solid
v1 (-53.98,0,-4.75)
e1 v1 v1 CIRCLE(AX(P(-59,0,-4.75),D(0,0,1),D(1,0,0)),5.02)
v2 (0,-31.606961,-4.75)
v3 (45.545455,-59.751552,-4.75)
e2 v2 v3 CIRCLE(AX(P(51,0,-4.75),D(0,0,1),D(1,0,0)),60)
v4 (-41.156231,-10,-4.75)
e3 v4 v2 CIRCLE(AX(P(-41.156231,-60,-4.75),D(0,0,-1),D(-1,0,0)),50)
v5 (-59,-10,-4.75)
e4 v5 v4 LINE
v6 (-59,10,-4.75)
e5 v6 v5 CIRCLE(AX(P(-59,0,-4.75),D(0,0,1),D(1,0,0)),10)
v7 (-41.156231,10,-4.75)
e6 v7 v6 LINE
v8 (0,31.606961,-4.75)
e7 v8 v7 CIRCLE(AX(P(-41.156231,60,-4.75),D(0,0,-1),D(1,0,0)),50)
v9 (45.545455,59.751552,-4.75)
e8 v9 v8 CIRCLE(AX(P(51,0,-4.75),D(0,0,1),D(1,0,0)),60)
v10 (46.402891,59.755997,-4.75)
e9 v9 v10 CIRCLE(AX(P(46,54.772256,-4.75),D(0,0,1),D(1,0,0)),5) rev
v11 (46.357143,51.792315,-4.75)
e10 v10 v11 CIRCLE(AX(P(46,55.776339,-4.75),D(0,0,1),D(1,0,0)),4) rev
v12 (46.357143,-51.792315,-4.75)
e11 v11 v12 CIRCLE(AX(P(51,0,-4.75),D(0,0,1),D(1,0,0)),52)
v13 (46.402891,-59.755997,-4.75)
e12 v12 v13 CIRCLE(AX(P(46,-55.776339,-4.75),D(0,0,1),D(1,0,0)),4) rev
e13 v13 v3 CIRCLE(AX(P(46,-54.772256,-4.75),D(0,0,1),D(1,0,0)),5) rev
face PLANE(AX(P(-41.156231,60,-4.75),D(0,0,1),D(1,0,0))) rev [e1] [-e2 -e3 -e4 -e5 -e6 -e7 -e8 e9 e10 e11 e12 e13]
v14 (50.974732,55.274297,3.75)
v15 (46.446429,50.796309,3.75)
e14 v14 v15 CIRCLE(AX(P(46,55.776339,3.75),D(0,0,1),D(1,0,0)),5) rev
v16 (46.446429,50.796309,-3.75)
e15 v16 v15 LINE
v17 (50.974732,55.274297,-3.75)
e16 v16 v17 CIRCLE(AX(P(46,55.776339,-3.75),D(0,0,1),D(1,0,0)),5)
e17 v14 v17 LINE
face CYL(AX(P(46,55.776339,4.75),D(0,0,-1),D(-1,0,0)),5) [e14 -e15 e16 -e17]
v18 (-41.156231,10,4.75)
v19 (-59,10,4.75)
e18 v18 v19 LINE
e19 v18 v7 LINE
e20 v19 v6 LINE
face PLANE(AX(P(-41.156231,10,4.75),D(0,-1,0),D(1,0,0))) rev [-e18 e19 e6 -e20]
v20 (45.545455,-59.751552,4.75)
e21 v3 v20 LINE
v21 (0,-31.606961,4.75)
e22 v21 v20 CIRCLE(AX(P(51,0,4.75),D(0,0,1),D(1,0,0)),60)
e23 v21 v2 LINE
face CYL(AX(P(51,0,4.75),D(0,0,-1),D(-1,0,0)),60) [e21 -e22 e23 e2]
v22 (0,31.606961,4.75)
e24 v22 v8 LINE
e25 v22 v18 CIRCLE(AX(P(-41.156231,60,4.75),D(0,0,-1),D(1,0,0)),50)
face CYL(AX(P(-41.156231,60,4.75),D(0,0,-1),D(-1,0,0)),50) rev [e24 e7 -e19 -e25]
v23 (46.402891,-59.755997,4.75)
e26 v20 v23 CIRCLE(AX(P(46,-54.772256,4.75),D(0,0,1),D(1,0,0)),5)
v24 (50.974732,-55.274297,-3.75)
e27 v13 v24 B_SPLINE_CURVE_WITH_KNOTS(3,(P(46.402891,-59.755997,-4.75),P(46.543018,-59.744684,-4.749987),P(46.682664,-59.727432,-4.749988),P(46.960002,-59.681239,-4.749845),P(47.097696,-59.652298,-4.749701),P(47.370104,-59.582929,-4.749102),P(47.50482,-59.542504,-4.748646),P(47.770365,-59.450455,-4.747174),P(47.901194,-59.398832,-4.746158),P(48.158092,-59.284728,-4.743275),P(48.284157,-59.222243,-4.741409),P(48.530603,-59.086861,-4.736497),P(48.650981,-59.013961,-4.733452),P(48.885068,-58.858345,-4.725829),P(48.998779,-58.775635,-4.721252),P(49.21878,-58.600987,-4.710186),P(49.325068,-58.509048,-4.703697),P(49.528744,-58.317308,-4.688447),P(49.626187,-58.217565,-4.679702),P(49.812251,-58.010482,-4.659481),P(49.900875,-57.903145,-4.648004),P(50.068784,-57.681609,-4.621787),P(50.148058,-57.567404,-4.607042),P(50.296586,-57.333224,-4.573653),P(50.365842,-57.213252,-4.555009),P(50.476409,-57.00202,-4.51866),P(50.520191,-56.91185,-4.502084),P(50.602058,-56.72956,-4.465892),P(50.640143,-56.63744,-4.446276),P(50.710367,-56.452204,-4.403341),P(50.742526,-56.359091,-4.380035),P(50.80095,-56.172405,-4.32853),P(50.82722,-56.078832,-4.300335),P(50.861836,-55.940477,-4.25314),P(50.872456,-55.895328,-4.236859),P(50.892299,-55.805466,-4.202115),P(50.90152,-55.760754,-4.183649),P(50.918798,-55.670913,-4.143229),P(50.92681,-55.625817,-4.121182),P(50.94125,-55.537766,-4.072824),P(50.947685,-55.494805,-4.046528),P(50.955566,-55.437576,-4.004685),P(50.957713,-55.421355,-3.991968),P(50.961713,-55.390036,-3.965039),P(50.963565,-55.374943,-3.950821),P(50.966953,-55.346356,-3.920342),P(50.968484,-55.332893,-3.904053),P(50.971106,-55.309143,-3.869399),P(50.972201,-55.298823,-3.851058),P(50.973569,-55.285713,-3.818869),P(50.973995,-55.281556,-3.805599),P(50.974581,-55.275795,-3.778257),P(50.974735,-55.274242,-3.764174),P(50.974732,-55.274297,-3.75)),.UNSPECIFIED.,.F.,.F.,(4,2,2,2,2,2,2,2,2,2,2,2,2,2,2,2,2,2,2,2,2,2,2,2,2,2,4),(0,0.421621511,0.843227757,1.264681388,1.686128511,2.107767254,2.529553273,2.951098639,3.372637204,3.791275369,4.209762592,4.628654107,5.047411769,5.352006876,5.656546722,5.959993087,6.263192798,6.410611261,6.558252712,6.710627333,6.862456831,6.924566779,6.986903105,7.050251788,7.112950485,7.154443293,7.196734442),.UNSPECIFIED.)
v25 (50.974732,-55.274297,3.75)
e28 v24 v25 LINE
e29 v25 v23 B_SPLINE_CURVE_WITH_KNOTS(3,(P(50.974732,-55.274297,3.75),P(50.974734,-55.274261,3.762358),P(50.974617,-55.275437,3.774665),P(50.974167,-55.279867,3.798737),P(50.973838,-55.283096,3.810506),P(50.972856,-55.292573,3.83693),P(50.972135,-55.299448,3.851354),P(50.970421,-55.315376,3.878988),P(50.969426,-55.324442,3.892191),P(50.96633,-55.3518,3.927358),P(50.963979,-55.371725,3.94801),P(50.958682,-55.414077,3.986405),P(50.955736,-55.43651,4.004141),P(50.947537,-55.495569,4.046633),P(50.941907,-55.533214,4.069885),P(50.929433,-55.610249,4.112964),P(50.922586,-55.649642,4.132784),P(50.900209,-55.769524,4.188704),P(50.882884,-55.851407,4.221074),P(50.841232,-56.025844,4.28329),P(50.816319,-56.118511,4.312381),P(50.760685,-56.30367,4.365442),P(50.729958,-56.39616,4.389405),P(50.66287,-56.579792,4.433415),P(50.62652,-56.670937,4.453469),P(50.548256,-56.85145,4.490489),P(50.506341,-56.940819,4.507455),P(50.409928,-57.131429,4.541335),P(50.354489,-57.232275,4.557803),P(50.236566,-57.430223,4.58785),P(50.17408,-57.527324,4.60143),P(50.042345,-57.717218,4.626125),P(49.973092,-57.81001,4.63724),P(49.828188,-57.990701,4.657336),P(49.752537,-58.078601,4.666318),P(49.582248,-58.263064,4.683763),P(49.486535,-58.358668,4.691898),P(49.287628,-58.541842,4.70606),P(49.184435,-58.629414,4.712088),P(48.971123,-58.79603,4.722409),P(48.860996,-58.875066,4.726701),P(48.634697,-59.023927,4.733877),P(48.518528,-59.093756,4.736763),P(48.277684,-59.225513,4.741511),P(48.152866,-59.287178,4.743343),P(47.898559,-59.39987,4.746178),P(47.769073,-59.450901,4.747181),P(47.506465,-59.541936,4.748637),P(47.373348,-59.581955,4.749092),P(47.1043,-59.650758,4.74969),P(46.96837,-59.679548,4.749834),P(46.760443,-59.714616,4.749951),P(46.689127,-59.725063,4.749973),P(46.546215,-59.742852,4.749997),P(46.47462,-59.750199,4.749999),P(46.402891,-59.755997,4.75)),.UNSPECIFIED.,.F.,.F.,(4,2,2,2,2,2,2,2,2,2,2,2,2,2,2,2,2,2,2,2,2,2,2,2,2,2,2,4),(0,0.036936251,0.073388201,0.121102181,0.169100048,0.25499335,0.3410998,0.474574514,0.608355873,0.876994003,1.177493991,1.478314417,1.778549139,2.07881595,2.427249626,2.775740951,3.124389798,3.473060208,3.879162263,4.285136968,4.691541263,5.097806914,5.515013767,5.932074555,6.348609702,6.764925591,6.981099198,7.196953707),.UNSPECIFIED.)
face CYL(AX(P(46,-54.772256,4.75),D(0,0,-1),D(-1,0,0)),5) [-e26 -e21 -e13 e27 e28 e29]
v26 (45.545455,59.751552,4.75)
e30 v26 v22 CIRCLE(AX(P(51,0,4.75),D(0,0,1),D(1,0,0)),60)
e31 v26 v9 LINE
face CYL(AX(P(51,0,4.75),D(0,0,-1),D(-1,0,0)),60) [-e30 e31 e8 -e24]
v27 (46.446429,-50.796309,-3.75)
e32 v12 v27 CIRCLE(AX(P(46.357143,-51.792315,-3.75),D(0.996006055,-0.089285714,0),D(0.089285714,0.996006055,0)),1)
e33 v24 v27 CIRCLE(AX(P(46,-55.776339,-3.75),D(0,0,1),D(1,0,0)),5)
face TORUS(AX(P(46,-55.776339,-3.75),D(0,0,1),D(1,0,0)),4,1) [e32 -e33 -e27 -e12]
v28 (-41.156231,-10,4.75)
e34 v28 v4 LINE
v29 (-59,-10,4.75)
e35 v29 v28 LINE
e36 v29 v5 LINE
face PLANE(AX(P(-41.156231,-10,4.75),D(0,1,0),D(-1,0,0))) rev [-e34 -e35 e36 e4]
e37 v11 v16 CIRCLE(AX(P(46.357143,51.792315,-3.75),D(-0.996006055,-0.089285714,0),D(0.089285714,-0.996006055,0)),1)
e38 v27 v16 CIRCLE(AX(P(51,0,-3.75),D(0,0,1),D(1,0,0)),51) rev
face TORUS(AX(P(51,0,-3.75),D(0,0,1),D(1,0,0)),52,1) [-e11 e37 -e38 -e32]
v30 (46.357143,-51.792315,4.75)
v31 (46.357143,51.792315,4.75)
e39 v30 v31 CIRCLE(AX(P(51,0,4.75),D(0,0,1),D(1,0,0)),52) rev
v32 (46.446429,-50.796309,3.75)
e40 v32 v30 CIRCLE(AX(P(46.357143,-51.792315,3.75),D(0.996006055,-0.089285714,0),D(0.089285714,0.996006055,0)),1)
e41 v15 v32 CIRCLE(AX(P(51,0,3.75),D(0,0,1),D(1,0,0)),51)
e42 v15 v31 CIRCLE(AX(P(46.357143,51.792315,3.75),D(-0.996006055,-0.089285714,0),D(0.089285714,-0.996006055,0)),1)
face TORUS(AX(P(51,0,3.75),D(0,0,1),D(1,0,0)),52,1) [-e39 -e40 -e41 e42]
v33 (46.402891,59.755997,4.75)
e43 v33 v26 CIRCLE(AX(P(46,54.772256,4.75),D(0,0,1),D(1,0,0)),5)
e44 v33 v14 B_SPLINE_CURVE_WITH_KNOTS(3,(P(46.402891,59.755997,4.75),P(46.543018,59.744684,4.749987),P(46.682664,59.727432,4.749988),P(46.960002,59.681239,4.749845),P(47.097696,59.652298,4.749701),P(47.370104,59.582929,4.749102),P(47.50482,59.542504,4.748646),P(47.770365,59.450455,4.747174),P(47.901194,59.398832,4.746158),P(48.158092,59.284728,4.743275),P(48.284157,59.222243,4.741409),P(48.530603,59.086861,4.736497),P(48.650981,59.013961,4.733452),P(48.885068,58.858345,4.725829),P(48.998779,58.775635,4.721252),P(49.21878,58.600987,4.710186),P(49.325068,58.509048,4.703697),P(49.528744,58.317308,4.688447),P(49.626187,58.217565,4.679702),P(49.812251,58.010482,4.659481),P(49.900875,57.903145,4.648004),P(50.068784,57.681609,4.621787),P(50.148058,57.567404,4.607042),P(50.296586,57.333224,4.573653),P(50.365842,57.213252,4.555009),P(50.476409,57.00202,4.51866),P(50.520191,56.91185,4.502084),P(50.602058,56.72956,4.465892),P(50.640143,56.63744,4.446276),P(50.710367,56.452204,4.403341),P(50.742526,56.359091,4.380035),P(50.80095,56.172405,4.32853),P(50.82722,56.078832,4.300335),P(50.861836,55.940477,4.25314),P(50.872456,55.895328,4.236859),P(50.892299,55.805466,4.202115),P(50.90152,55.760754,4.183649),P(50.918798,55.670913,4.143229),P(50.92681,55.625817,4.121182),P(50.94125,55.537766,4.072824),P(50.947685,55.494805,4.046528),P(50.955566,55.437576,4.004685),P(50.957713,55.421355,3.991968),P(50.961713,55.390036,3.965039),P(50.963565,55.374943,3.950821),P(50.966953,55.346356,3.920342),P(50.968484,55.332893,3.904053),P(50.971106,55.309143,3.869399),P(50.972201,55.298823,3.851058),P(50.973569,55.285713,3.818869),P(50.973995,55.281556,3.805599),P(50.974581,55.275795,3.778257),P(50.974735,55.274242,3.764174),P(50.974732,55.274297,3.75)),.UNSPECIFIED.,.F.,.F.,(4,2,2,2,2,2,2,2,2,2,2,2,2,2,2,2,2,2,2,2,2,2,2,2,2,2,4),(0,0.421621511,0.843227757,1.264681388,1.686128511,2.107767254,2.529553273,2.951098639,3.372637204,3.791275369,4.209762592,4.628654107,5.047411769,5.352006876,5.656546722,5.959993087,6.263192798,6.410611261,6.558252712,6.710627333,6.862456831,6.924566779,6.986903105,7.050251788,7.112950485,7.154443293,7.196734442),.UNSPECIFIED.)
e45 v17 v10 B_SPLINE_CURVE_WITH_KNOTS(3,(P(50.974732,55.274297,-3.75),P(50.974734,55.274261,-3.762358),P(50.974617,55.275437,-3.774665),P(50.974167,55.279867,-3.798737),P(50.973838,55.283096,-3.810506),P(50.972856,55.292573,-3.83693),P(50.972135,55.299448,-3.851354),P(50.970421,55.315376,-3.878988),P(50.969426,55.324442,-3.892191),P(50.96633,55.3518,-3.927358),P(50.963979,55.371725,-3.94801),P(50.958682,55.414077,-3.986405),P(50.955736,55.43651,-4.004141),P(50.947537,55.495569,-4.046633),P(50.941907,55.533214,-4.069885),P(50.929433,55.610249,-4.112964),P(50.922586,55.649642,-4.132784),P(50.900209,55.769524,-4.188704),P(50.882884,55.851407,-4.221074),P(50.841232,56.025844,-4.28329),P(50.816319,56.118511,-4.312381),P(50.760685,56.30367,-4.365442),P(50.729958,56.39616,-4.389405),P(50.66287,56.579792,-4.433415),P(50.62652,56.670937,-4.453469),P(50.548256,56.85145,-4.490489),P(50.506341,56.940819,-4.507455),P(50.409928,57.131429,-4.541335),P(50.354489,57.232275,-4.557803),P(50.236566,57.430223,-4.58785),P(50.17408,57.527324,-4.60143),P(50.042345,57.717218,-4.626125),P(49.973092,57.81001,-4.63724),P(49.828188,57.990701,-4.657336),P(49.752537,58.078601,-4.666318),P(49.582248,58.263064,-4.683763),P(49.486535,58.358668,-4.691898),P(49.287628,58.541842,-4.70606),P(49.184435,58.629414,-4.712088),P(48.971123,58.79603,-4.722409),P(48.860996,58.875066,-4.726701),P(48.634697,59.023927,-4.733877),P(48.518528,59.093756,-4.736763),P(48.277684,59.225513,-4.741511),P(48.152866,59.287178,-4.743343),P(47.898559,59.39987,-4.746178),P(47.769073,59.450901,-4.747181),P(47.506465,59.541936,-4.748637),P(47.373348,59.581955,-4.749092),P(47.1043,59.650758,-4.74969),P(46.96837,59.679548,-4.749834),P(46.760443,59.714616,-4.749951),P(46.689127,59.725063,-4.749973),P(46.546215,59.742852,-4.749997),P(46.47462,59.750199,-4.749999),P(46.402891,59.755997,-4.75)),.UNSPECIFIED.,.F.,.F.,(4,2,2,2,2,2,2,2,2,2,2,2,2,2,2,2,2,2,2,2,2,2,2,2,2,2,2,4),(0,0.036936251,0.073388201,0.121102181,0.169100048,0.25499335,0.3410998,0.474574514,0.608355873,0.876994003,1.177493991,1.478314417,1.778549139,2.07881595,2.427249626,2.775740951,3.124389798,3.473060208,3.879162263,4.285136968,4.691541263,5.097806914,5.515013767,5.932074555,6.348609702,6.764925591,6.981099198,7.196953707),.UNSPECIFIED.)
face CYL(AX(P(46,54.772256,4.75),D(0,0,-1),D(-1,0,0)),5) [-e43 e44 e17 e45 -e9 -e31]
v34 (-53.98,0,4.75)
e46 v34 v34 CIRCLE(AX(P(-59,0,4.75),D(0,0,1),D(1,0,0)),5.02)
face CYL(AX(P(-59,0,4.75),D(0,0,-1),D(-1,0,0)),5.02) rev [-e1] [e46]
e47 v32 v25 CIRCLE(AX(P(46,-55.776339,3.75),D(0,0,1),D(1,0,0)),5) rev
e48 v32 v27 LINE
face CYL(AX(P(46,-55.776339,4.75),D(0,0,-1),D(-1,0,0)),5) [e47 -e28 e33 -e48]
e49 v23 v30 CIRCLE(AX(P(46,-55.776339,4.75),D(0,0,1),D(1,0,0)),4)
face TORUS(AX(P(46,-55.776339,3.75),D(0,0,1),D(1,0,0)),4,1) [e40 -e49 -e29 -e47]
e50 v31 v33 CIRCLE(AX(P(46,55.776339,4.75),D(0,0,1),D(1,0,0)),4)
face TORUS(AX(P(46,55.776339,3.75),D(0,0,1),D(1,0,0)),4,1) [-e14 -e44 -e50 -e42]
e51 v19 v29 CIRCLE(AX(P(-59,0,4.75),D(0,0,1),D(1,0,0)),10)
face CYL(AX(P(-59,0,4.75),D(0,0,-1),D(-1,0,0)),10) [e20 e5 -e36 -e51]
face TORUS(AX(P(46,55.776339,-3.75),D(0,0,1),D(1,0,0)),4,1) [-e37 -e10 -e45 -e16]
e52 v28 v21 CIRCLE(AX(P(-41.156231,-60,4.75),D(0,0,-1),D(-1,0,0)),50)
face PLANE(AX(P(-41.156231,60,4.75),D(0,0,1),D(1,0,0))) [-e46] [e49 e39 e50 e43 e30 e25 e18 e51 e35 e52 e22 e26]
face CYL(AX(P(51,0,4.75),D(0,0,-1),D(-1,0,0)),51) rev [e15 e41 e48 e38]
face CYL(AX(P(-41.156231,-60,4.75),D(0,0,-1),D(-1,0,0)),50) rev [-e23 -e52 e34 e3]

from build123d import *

# Parameters (mm, degrees)
SKETCH1_R           = 5.02
BOSS_EXTRUDE1_DEPTH = 4.75
FILLET2_R           = 5
FILLET3_R           = 1


with BuildPart() as part:
    # Sketch1 → Boss-Extrude1 (new, symmetric)
    with BuildSketch(Plane.XY):
        with BuildLine():
            Line((51, -60), (51, -51))
            ThreePointArc((51, -51), (0, 0), (51, 51))
            Line((51, 51), (51, 60))
            ThreePointArc((51, 60), (21.814538512, 52.423361565), (0, 31.606961259))
            ThreePointArc((0, 31.606961259), (-17.914586674, 15.730078286), (-41.156231011, 10))
            Line((-41.156231011, 10), (-59, 10))
            ThreePointArc((-59, 10), (-69, 0), (-59, -10))
            Line((-59, -10), (-41.156231011, -10))
            ThreePointArc((-41.156231011, -10), (-17.914586674, -15.730078286), (0, -31.606961259))
            ThreePointArc((0, -31.606961259), (21.814538512, -52.423361565), (51, -60))
        make_face()
        with Locations((-59, 0)):
            Circle(SKETCH1_R, mode=Mode.SUBTRACT)
    extrude(amount=BOSS_EXTRUDE1_DEPTH, both=True)

    # Fillet2
    # the kernel refuses this fillet: 5 mm, written as the material it takes off along each edge
    with BuildSketch(Plane(origin=(51, -60, 18.400501973), x_dir=(0, 1, 0), z_dir=(0, 0, -1))) as fillet2_piece_1:
        with BuildLine():
            CenterArc((5.227744249, -5), FILLET2_R, 90, 95.21590857)
            ThreePointArc((0.248448272, -5.454545455), (0.062144251, -2.730100395), (0, 0))
            Line((0, 0), (5.227744249, 0))
        make_face()
    extrude(amount=36.801003947, mode=Mode.SUBTRACT)
    with BuildSketch(Plane(origin=(51, -51, -16.690847674), x_dir=(0, -1, 0), z_dir=(0, 0, 1))) as fillet2_piece_2:
        with BuildLine():
            CenterArc((4.77633907, -5), FILLET2_R, 90, 84.8774839)
            ThreePointArc((-0.203691205, -4.553571429), (-0.050948249, -2.279062464), (0, 0))
            Line((0, 0), (4.77633907, 0))
        make_face()
    extrude(amount=33.381695348, mode=Mode.SUBTRACT)
    with BuildSketch(Plane(origin=(51, 60, -18.400501973), x_dir=(-0.9989642624898897, -0.04550167324429649, 0), z_dir=(0, 0, 1))) as fillet2_piece_3:
        with BuildLine():
            CenterArc((5.232692423, 4.994821312), FILLET2_R, 177.392045715, 95.21590857)
            Line((0.237871111, 5.222329679), (0, 0))
            ThreePointArc((0, 0), (2.730100395, -0.062144251), (5.460200789, 0))
        make_face()
    extrude(amount=36.801003947, mode=Mode.SUBTRACT)
    with BuildSketch(Plane(origin=(51, 51, -16.690847674), x_dir=(0, 1, 0), z_dir=(0, 0, 1))) as fillet2_piece_4:
        with BuildLine():
            CenterArc((4.77633907, 5), FILLET2_R, 185.1225161, 84.8774839)
            ThreePointArc((-0.203691205, 4.553571429), (-0.050948249, 2.279062464), (0, 0))
            Line((0, 0), (4.77633907, 0))
        make_face()
    extrude(amount=33.381695348, mode=Mode.SUBTRACT)

    # Fillet3
    fillet3_edges = [part.edges().sort_by_distance(p)[0] for p in [
        (0, 0, -4.75),
        (49.515727495, 52.221109094, -4.75),
        (49.515727495, -52.221109094, -4.75),
        (0, 0, 4.75),
        (49.515727495, 52.221109094, 4.75),
        (49.515727495, -52.221109094, 4.75),
    ]]
    fillet(fillet3_edges, radius=FILLET3_R)


solid = part.part
